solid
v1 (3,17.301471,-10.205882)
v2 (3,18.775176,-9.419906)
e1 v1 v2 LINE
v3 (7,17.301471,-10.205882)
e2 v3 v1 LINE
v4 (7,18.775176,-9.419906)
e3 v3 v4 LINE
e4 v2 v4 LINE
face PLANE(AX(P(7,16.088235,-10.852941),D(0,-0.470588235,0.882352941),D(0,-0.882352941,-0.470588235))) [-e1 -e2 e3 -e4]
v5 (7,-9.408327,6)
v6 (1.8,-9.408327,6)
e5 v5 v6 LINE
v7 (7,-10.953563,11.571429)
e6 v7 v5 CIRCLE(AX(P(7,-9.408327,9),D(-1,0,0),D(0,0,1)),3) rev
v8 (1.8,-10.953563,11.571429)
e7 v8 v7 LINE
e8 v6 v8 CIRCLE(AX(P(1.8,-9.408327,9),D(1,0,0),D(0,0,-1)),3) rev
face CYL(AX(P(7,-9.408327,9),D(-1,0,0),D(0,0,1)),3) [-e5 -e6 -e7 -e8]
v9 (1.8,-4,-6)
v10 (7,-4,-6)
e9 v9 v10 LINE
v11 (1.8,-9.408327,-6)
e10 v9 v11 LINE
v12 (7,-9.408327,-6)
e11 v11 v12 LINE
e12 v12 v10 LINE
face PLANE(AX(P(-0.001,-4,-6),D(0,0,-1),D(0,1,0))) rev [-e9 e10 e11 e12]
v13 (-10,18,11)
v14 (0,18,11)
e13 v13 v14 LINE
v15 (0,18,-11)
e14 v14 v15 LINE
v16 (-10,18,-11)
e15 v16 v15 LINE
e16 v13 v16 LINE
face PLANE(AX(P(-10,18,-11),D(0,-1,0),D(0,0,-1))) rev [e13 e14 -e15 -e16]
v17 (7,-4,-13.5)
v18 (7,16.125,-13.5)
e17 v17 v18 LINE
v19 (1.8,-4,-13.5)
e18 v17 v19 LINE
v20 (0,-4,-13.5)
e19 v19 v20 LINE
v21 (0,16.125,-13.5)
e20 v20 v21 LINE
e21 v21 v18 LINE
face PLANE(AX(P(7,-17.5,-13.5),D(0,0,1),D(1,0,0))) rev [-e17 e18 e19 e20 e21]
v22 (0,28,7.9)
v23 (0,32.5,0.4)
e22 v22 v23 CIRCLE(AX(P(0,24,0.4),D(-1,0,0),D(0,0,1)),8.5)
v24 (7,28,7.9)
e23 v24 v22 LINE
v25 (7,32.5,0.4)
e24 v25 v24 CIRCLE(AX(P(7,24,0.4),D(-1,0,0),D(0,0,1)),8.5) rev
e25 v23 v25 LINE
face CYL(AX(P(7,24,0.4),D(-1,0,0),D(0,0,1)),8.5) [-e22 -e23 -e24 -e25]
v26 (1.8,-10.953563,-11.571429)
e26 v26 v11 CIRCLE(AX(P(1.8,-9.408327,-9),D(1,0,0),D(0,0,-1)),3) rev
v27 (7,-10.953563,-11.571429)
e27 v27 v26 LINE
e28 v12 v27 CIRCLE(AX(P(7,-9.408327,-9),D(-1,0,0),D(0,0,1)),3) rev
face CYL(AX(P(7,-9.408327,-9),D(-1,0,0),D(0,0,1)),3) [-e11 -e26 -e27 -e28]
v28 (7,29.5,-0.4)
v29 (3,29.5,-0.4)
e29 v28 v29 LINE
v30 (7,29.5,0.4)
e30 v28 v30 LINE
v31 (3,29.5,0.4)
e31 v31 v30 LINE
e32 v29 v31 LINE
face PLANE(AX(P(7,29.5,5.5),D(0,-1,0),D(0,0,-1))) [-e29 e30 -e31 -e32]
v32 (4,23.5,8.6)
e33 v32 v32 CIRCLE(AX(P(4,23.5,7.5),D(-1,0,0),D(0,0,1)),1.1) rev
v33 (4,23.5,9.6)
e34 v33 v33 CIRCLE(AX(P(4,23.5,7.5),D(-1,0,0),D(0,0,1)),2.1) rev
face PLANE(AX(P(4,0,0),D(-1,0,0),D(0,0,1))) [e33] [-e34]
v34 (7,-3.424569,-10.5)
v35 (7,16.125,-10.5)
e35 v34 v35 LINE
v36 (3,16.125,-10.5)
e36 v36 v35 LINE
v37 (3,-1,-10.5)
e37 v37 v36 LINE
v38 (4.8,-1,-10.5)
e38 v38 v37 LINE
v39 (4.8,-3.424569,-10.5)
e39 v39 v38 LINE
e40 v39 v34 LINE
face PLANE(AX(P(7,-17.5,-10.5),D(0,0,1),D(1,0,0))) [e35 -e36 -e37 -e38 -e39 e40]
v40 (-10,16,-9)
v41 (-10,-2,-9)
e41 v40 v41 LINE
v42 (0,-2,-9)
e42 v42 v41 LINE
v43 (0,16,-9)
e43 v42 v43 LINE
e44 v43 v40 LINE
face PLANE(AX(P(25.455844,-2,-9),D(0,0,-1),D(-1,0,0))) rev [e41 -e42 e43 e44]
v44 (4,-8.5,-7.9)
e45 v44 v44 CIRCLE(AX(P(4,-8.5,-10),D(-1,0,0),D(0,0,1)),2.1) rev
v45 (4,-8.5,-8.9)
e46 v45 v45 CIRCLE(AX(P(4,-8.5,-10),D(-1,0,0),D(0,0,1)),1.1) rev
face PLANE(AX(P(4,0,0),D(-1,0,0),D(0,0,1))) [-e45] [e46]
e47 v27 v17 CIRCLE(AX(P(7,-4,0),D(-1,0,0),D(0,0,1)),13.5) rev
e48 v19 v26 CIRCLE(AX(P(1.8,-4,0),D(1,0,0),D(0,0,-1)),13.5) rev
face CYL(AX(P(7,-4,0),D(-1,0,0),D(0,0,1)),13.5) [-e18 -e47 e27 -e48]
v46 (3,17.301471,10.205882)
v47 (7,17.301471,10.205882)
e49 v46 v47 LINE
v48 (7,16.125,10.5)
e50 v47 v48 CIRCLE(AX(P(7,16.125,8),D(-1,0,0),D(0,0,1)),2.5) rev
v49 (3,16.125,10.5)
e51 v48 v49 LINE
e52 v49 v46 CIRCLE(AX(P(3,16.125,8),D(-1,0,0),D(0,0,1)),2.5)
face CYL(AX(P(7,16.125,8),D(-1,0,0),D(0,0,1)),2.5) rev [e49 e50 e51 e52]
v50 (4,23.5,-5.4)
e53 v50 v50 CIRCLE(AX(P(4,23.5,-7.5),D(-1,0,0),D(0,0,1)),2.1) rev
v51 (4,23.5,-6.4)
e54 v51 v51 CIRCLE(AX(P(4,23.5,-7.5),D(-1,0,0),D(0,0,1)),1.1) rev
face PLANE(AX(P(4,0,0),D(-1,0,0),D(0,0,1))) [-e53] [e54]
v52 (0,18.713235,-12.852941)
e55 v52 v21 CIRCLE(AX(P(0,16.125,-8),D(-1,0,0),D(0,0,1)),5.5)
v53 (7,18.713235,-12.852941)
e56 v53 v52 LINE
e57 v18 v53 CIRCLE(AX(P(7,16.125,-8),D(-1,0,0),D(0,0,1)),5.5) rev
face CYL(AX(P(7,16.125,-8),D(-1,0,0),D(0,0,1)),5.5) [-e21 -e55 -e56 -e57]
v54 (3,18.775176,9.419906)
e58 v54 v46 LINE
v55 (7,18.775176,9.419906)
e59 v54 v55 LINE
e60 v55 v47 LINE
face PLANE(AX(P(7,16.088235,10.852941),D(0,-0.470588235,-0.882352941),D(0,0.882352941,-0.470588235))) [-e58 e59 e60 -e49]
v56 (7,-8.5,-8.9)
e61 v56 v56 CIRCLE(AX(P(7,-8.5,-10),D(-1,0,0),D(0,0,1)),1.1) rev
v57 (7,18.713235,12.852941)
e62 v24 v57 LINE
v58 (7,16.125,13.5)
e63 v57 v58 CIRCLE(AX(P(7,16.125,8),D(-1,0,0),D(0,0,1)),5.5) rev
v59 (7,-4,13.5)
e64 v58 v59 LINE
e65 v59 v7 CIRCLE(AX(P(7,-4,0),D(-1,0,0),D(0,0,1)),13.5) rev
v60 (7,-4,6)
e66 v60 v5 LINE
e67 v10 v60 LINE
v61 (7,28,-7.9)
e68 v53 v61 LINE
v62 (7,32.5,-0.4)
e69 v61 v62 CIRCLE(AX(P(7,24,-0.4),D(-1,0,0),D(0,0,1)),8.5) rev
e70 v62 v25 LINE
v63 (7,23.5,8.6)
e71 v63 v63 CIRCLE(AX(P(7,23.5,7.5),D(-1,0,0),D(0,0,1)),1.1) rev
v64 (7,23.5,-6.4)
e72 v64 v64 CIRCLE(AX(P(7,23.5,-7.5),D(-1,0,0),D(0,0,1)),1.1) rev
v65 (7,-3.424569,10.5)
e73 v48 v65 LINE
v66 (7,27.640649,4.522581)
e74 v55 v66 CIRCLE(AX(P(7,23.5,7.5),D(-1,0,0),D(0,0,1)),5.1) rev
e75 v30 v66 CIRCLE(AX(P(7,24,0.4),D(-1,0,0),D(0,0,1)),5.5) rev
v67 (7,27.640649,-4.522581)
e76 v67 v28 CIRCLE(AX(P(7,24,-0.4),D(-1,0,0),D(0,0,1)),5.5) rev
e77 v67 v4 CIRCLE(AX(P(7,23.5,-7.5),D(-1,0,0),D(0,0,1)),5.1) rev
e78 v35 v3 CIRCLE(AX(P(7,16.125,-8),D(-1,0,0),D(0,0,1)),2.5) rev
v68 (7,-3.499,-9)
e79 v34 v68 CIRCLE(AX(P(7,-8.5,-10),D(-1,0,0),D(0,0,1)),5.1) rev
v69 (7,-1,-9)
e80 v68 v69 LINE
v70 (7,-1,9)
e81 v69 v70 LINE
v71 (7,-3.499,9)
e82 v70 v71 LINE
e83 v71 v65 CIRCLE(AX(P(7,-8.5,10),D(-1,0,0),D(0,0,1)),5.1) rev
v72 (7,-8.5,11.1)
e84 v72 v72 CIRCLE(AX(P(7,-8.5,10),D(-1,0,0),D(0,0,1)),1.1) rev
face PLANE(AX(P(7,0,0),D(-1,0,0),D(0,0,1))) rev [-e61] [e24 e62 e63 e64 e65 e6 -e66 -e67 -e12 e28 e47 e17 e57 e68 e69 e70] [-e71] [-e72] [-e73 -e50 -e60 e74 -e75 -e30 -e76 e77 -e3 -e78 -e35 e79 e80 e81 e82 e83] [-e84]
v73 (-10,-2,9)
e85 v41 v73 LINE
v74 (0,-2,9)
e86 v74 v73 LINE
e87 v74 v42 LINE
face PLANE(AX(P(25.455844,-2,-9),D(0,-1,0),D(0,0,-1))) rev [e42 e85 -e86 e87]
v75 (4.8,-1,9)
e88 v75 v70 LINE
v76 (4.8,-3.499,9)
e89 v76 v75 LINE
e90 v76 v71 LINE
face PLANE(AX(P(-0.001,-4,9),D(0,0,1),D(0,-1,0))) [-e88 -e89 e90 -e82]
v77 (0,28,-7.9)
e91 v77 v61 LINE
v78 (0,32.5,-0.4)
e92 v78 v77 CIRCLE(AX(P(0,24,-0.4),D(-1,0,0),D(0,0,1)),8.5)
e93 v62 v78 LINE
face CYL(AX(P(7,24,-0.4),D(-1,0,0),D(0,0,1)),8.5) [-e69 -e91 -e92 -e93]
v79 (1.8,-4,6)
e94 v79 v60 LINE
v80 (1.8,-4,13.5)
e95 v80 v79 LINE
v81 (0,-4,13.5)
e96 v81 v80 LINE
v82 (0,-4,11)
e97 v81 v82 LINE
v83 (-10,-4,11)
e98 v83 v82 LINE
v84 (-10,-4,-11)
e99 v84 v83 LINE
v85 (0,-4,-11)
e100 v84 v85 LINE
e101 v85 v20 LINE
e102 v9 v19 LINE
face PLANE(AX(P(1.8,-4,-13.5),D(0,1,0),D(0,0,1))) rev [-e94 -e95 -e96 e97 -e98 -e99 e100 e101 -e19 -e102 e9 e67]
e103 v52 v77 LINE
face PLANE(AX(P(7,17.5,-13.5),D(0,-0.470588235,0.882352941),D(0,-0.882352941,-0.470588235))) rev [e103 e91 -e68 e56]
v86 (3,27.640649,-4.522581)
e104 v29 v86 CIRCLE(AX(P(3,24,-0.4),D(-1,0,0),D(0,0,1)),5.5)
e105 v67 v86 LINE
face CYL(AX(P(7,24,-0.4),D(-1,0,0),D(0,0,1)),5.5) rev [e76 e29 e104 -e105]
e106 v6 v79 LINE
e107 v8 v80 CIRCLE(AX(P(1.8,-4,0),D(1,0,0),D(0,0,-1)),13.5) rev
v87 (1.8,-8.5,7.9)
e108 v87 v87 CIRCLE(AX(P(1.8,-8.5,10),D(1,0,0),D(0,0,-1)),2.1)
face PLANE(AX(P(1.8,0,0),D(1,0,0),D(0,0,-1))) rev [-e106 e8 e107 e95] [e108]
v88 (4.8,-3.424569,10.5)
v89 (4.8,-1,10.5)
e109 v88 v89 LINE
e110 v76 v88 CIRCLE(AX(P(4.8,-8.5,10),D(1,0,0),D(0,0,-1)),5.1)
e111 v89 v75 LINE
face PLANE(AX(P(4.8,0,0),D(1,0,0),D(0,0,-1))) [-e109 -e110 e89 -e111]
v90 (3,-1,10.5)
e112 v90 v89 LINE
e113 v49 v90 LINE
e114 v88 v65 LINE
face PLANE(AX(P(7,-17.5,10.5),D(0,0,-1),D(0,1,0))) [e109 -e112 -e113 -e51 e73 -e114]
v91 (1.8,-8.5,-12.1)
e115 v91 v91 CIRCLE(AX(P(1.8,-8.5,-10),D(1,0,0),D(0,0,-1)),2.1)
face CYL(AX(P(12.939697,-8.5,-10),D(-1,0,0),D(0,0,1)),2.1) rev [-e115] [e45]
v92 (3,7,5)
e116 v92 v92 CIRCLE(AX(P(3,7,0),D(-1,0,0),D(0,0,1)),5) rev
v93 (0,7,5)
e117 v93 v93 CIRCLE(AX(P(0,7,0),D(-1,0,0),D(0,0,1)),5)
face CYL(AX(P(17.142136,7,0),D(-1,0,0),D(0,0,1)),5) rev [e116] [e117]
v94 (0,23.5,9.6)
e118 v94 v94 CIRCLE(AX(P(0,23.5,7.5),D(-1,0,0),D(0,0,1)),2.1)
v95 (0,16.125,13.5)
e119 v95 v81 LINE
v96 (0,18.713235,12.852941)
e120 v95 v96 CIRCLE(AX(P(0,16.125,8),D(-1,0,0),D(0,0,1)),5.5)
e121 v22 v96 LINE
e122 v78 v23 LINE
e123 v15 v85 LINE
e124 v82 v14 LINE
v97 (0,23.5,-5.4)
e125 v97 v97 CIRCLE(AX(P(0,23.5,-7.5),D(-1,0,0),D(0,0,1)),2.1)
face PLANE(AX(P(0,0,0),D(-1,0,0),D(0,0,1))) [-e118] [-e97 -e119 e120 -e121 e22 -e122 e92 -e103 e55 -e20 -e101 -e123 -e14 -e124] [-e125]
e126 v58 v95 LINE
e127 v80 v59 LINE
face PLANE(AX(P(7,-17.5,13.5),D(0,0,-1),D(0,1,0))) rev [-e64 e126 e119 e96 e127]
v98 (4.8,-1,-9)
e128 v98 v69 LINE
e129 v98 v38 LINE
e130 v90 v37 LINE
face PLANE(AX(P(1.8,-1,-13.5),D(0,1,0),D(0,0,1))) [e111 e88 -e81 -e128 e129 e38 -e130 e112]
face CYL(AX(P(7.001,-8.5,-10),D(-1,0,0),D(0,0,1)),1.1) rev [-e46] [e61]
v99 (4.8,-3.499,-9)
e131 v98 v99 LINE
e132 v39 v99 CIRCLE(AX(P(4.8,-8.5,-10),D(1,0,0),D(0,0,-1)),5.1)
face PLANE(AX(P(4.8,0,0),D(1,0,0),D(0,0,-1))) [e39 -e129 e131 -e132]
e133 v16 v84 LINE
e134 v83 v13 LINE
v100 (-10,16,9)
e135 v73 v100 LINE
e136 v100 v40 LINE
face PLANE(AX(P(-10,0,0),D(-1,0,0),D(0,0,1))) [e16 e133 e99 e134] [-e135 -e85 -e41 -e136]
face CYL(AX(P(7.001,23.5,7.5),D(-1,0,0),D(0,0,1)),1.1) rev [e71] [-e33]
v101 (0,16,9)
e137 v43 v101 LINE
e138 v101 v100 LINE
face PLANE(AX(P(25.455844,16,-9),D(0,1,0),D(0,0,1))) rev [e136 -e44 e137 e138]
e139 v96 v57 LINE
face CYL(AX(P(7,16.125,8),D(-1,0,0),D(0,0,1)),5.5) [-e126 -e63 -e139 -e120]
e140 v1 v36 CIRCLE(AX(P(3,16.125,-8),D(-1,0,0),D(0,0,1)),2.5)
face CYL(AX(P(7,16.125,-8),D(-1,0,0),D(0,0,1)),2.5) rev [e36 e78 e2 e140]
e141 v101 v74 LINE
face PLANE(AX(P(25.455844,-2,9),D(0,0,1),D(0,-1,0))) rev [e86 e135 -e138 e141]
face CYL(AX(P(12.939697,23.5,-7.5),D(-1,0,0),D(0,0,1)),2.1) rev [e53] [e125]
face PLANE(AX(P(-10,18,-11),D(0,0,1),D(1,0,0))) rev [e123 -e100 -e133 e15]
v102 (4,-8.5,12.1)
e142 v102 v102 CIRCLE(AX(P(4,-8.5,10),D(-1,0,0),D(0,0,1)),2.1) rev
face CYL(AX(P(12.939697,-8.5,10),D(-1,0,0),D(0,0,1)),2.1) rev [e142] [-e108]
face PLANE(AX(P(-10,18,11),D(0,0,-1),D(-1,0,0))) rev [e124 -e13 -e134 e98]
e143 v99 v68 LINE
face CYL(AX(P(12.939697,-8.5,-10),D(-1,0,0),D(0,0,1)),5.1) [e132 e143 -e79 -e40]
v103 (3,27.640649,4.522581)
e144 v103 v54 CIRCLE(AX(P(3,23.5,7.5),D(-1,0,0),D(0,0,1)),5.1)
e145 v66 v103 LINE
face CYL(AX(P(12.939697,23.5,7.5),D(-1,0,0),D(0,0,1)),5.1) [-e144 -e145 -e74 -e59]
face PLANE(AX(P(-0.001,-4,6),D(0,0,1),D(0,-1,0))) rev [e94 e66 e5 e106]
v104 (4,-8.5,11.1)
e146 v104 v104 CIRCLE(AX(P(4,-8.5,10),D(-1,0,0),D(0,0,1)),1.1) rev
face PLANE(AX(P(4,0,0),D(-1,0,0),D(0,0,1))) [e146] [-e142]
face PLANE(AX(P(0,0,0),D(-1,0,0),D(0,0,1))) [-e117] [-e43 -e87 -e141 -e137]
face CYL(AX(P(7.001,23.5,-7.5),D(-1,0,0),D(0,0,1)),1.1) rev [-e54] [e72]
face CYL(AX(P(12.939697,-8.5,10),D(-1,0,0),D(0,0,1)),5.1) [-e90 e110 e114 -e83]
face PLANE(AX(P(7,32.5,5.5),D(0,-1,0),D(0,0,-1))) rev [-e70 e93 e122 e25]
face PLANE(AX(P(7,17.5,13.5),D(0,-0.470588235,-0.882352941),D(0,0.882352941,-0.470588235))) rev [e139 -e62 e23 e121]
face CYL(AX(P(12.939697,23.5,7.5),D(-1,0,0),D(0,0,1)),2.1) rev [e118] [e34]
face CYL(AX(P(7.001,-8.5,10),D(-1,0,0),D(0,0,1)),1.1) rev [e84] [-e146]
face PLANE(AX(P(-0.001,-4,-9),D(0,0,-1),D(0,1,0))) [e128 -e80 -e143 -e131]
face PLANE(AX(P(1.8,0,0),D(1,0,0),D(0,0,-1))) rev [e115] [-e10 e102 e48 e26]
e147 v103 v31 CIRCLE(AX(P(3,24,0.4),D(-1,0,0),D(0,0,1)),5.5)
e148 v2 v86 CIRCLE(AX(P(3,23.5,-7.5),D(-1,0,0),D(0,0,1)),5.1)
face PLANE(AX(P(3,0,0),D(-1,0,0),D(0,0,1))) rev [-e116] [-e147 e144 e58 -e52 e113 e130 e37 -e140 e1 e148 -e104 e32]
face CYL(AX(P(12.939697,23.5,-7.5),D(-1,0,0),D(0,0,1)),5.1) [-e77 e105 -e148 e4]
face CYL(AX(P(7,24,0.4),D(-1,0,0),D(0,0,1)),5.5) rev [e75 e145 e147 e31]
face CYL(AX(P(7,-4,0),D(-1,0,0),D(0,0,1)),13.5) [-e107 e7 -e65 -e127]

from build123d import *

# Parameters (mm, degrees)
BOSS_EXTRUDE1_DEPTH = 7
FILLET1_R           = 8.5
FILLET2_R           = 5.5
FILLET3_R           = 13.5
SKETCH3_W           = 27
SKETCH3_H           = 13.5
CUT_EXTRUDE1_DEPTH  = 1.8
CUT_EXTRUDE5_REACH  = 37.882
SKETCH12_W          = 12
SKETCH12_H          = 13.5
CUT_EXTRUDE6_REACH  = 37.882
SKETCH13_R          = 1.1
SKETCH17_R          = 2.1
CUT_EXTRUDE14_DEPTH = 4
FILLET4_R           = 3
SHELL2_START        = 3
SHELL2_DEPTH        = 4
SHELL2_START_2      = 4.8
SHELL2_2_DEPTH      = 2.2
SKETCH18_W          = 22
SKETCH18_H          = 22
BOSS_EXTRUDE2_DEPTH = 10
SKETCH19_W          = 18
SKETCH19_H          = 18
CUT_EXTRUDE15_DEPTH = 10
SKETCH20_R          = 5
CUT_EXTRUDE16_DEPTH = 3


# Read off the part's stored shape, not the designer's step: Shell2
with BuildPart() as part:
    # Sketch2 → Boss-Extrude1 (new body)
    with BuildSketch(Plane(origin=(0, 0, 0), x_dir=(0, 0, -1), z_dir=(1, 0, 0))):
        Polygon((-13.5, -17.5), (13.5, -17.5), (13.5, 17.5), (5.5, 32.5), (-5.5, 32.5), (-13.5, 17.5), align=None)
    extrude(amount=BOSS_EXTRUDE1_DEPTH)

    # Fillet1
    fillet1_edges = [part.edges().sort_by_distance(p)[0] for p in [
        (3.5, 32.5, 5.5),
        (3.5, 32.5, -5.5),
    ]]
    fillet(fillet1_edges, radius=FILLET1_R)

    # Fillet2
    fillet2_edges = [part.edges().sort_by_distance(p)[0] for p in [
        (3.5, 17.5, -13.5),
        (3.5, 17.5, 13.5),
    ]]
    fillet(fillet2_edges, radius=FILLET2_R)

    # Fillet3
    fillet3_edges = [part.edges().sort_by_distance(p)[0] for p in [
        (3.5, -17.5, 13.5),
        (3.5, -17.5, -13.5),
    ]]
    fillet(fillet3_edges, radius=FILLET3_R - 0.0001)  # a hair under: the kernel refuses the full size

    # Sketch3 → Cut-Extrude1 (cut)
    with BuildSketch(Plane.ZY):
        with Locations((0, -10.75)):
            Rectangle(SKETCH3_W, SKETCH3_H)
    extrude(amount=-CUT_EXTRUDE1_DEPTH, mode=Mode.SUBTRACT)

    # Sketch12 → Cut-Extrude5 (cut, up to next)
    with BuildSketch(Plane(origin=(7, 0, 0), x_dir=(0, 0, -1), z_dir=(1, 0, 0)), mode=Mode.PRIVATE) as cut_extrude5_sk1:
        with Locations((0, -10.75)):
            Rectangle(SKETCH12_W, SKETCH12_H)
    cut_extrude5_tool1 = extrude(cut_extrude5_sk1.sketch, amount=-CUT_EXTRUDE5_REACH, mode=Mode.PRIVATE) & part.part
    add(cut_extrude5_tool1.solids().sort_by_distance((7, -10.75, 0))[0], mode=Mode.SUBTRACT)

    # Sketch13 → Cut-Extrude6 (cut, up to next)
    with BuildSketch(Plane.ZY, mode=Mode.PRIVATE) as cut_extrude6_sk1:
        with Locations((-7.5, 23.5)):
            Circle(SKETCH13_R)
    cut_extrude6_tool1 = extrude(cut_extrude6_sk1.sketch, amount=-CUT_EXTRUDE6_REACH, mode=Mode.PRIVATE) & part.part
    # Sketch13 → Cut-Extrude6 (cut, up to next)
    with BuildSketch(Plane.ZY, mode=Mode.PRIVATE) as cut_extrude6_sk2:
        with Locations((-10, -8.5)):
            Circle(SKETCH13_R)
    cut_extrude6_tool2 = extrude(cut_extrude6_sk2.sketch, amount=-CUT_EXTRUDE6_REACH, mode=Mode.PRIVATE) & part.part
    # Sketch13 → Cut-Extrude6 (cut, up to next)
    with BuildSketch(Plane.ZY, mode=Mode.PRIVATE) as cut_extrude6_sk3:
        with Locations((10, -8.5)):
            Circle(SKETCH13_R)
    cut_extrude6_tool3 = extrude(cut_extrude6_sk3.sketch, amount=-CUT_EXTRUDE6_REACH, mode=Mode.PRIVATE) & part.part
    # Sketch13 → Cut-Extrude6 (cut, up to next)
    with BuildSketch(Plane.ZY, mode=Mode.PRIVATE) as cut_extrude6_sk4:
        with Locations((7.5, 23.5)):
            Circle(SKETCH13_R)
    cut_extrude6_tool4 = extrude(cut_extrude6_sk4.sketch, amount=-CUT_EXTRUDE6_REACH, mode=Mode.PRIVATE) & part.part
    add(cut_extrude6_tool1.solids().sort_by_distance((0, 23.5, -7.5))[0], mode=Mode.SUBTRACT)
    add(cut_extrude6_tool2.solids().sort_by_distance((0, -8.5, -10))[0], mode=Mode.SUBTRACT)
    add(cut_extrude6_tool3.solids().sort_by_distance((0, -8.5, 10))[0], mode=Mode.SUBTRACT)
    add(cut_extrude6_tool4.solids().sort_by_distance((0, 23.5, 7.5))[0], mode=Mode.SUBTRACT)

    # Sketch17 → Cut-Extrude14 (cut)
    with BuildSketch(Plane.ZY):
        with Locations((-7.5, 23.5)):
            Circle(SKETCH17_R)
        with Locations((7.5, 23.5)):
            Circle(SKETCH17_R)
        with Locations((-10, -8.5)):
            Circle(SKETCH17_R)
        with Locations((10, -8.5)):
            Circle(SKETCH17_R)
    extrude(amount=-CUT_EXTRUDE14_DEPTH, mode=Mode.SUBTRACT)

    # Fillet4
    fillet4_edges = [part.edges().sort_by_distance(p)[0] for p in [
        (4.4, -16.093424605, -6),
        (4.4, -16.093424605, 6),
    ]]
    fillet(fillet4_edges, radius=FILLET4_R)

    # Shell2 outline → Shell2 (cut)
    with BuildSketch(Plane.YZ.offset(SHELL2_START)):
        with BuildLine():
            Line((17.301470588, -10.205882353), (18.775176121, -9.419906069))
            ThreePointArc((18.775176121, -9.419906069), (21.033978224, -3.035838645), (27.640649185, -4.522580929))
            ThreePointArc((27.640649185, -4.522580929), (29.013659867, -2.661241858), (29.5, -0.4))
            Line((29.5, -0.4), (29.5, 0.4))
            ThreePointArc((29.5, 0.4), (29.013659867, 2.661241858), (27.640649185, 4.522580929))
            ThreePointArc((27.640649185, 4.522580929), (21.033978224, 3.035838645), (18.775176121, 9.419906069))
            Line((18.775176121, 9.419906069), (17.301470588, 10.205882353))
            ThreePointArc((17.301470588, 10.205882353), (16.731339062, 10.42535625), (16.125, 10.5))
            Line((16.125, 10.5), (-1, 10.5))
            Line((-1, 10.5), (-1, -10.5))
            Line((-1, -10.5), (16.125, -10.5))
            ThreePointArc((16.125, -10.5), (16.731339062, -10.42535625), (17.301470588, -10.205882353))
        make_face()
    extrude(amount=SHELL2_DEPTH, mode=Mode.SUBTRACT)

    # Shell2 2 outline → Shell2 2 (cut)
    with BuildSketch(Plane.YZ.offset(SHELL2_START_2)):
        with BuildLine():
            Line((-3.424568984, -10.5), (-1, -10.5))
            Line((-1, -10.5), (-1, -9))
            Line((-1, -9), (-3.4990001, -9))
            ThreePointArc((-3.4990001, -9), (-3.406267086, -9.747245183), (-3.424568984, -10.5))
        make_face()
        with BuildLine():
            Line((-3.4990001, 9), (-1, 9))
            Line((-1, 9), (-1, 10.5))
            Line((-1, 10.5), (-3.424568984, 10.5))
            ThreePointArc((-3.424568984, 10.5), (-3.406267086, 9.747245183), (-3.4990001, 9))
        make_face()
    extrude(amount=SHELL2_2_DEPTH, mode=Mode.SUBTRACT)

    # Sketch18 → Boss-Extrude2 (add)
    with BuildSketch(Plane.ZY):
        with Locations((0, 7)):
            Rectangle(SKETCH18_W, SKETCH18_H)
    extrude(amount=BOSS_EXTRUDE2_DEPTH)

    # Sketch19 → Cut-Extrude15 (cut)
    with BuildSketch(Plane.ZY.offset(10)):
        with Locations((0, 7)):
            Rectangle(SKETCH19_W, SKETCH19_H)
    extrude(amount=-CUT_EXTRUDE15_DEPTH, mode=Mode.SUBTRACT)

    # Sketch20 → Cut-Extrude16 (cut)
    with BuildSketch(Plane.ZY):
        with Locations((0, 7)):
            Circle(SKETCH20_R)
    extrude(amount=-CUT_EXTRUDE16_DEPTH, mode=Mode.SUBTRACT)


solid = part.part
